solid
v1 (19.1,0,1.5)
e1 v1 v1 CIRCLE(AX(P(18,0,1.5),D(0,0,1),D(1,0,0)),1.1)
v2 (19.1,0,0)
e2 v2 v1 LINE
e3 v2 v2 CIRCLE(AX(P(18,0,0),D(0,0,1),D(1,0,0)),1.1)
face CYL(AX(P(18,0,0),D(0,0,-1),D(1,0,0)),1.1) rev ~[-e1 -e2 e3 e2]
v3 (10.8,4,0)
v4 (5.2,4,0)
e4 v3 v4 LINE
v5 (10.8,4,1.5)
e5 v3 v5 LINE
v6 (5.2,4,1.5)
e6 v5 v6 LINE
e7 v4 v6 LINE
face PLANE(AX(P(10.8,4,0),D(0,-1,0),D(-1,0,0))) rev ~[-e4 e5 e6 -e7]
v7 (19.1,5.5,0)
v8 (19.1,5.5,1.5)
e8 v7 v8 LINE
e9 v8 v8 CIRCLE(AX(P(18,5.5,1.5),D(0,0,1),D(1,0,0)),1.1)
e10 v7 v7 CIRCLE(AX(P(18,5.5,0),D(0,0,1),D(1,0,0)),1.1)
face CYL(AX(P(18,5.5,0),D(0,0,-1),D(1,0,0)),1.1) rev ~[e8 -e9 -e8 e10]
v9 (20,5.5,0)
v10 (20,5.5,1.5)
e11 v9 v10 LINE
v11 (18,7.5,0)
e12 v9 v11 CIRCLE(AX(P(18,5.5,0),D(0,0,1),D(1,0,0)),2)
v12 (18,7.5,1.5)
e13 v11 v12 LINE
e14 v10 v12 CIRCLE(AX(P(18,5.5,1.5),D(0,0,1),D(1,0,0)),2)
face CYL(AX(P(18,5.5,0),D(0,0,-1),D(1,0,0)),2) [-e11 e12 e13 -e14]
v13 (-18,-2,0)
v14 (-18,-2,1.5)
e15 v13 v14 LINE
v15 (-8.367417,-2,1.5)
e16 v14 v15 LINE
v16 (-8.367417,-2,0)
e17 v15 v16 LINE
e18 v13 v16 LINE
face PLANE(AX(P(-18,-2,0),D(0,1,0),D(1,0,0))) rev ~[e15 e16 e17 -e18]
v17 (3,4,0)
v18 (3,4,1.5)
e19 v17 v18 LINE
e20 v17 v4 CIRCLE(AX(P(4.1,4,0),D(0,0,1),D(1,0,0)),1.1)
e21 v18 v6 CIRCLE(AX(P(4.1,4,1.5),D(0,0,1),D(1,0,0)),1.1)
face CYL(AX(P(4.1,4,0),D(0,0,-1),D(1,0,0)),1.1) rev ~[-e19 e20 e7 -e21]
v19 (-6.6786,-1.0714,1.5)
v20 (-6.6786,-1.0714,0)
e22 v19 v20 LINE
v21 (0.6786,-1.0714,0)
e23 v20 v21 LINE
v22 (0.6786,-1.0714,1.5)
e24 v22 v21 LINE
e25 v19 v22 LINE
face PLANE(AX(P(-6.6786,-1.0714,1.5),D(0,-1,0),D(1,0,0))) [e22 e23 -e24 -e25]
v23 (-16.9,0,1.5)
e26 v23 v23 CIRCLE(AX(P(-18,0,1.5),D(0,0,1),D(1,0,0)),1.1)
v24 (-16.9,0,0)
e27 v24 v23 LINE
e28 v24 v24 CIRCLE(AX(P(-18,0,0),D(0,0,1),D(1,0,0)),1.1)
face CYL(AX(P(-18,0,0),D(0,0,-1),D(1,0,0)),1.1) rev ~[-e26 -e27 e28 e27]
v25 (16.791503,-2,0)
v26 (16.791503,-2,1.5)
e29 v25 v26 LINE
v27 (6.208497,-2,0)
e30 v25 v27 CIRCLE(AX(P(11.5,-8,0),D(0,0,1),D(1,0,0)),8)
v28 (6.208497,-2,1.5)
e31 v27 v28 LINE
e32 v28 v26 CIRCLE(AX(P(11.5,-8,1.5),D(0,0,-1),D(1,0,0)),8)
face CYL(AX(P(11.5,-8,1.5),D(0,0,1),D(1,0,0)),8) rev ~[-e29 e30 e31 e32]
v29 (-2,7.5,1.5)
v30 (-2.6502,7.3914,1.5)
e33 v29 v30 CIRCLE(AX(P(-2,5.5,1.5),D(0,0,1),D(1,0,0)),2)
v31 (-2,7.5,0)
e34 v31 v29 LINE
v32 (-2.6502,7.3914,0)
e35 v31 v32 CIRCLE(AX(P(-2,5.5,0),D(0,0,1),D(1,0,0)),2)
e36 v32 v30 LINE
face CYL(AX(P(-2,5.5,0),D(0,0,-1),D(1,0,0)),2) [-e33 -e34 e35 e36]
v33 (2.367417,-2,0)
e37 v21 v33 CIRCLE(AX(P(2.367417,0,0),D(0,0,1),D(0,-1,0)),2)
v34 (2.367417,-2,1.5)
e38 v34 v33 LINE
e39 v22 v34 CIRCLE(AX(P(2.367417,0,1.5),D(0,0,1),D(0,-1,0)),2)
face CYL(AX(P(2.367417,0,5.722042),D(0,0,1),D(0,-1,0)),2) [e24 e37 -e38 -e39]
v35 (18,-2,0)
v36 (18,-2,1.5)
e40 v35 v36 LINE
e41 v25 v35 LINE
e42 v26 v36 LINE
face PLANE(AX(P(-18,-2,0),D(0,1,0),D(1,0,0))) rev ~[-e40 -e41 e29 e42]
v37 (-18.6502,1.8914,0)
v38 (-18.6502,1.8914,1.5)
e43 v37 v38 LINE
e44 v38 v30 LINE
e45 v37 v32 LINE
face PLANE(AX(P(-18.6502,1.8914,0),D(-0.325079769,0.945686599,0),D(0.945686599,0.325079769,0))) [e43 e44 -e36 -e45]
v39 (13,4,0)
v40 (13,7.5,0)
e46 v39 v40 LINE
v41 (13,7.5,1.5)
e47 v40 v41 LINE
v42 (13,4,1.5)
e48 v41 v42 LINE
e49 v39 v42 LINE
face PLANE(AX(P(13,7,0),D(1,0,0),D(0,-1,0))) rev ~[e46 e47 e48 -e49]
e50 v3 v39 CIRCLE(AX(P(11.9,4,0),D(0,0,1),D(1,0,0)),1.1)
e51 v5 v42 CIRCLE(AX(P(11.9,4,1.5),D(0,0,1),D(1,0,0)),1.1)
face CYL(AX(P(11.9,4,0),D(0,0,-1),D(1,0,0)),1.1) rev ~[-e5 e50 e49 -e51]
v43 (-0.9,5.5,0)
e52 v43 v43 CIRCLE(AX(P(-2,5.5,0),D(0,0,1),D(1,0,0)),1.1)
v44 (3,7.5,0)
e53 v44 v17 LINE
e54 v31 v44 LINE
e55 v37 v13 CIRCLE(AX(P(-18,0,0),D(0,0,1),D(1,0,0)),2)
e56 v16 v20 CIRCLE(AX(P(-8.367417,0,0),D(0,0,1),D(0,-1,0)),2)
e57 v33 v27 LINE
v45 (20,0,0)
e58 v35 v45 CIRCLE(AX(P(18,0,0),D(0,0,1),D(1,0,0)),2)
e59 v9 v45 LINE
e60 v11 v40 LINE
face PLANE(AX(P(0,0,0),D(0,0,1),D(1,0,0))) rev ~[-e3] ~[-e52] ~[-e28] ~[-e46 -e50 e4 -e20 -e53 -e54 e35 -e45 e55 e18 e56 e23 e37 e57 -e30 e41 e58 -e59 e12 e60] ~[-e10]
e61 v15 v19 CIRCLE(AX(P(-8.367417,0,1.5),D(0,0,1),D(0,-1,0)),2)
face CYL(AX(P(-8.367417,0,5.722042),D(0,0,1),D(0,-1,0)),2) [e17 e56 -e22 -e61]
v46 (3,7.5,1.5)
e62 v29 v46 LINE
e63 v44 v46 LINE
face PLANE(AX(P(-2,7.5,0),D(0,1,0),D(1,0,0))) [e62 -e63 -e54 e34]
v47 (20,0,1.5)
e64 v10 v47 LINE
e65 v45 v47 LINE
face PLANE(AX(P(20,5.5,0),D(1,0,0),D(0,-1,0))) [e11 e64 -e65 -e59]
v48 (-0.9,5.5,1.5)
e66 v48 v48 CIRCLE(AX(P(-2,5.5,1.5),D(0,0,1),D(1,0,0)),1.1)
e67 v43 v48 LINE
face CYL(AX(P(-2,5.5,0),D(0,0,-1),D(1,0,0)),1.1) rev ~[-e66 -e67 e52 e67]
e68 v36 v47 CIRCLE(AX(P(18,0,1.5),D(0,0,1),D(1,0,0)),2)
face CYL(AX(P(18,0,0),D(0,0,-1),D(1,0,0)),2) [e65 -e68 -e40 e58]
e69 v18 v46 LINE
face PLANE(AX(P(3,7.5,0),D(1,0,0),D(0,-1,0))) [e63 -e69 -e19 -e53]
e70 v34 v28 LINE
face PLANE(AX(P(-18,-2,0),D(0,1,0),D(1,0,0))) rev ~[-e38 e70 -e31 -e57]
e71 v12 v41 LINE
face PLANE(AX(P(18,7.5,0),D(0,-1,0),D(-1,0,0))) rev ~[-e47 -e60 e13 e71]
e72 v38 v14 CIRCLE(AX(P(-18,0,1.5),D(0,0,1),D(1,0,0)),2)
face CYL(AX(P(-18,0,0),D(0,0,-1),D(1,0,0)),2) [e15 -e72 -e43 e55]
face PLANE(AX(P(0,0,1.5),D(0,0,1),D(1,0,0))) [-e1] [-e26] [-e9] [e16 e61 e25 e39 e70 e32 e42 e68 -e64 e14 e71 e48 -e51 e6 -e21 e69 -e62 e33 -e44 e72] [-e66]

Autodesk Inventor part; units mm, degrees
ref_plane "YZ Plane" through (0, 0, 0) normal (1, 0, 0) x (0, 1, 0)
ref_plane "XZ Plane" through (0, 0, 0) normal (0, 1, 0) x (-1, 0, 0)
ref_plane "XY Plane" through (0, 0, 0) normal (0, 0, 1) x (1, 0, 0)
sketch "スケッチ1" plane through (0, 0, 0) normal (0, 0, 1) x (1, 0, 0)
  circle A0 centre (-18, 0) radius 1.1
  circle A1 centre (18, 0) radius 1.1
  circle A2 centre (-18, 0) radius 2
  circle A3 centre (18, 0) radius 2
  line L0 (3, 7) -> (13, 7)
  line L1 (13, 7) -> (13, 4)
  line L2 (13, 4) -> (3, 4)
  line L3 (3, 4) -> (3, 7)
  circle A4 centre (4.1, 4) radius 1.1
  line L4 (8, 7) -> (8, 3.6941) construction
  circle A5 centre (11.9, 4) radius 1.1
  circle A6 centre (18, 5.5) radius 1.1
  circle A7 centre (-2, 5.5) radius 1.1
  circle A8 centre (-2, 5.5) radius 2
  circle A9 centre (18, 5.5) radius 2
  line L5 (-18.6502, 1.8914) -> (-2.6502, 7.3914)
  line L6 (-2, 7.5) -> (3, 7.5)
  line L7 (3, 7.5) -> (3, 7)
  line L8 (20, 5.5) -> (20, 0)
  line L9 (-18, -2) -> (18, -2)
  line L10 (18, 7.5) -> (13, 7.5)
  line L11 (13, 7.5) -> (13, 7)
  point P0 (0, 0)
  point P1 (13, 5.5)
  point P2 (10.8, 4)
  point P3 (5.2, 4)
  dimension "d0" = 2.2
  dimension "d1" = 2.2
  dimension "d2" = 36
  dimension "d3" = 18
  dimension "d4" = 4
  dimension "d5" = 4
  dimension "d6" = 3
  dimension "d7" = 10
  dimension "d8" = 2.2
  dimension "d9" = 2.2
  dimension "d10" = 5
  dimension "d11" = 4
  dimension "d12" = 4
  dimension "d13" = 4
extrude "押し出し1" add sketch "スケッチ1" along normal blind 1.5 contours A2 | A2 L5 A8 L6 L7 L3 A4 L2 A5 L1 L11 L10 A9 L8 A3 L9 | A8 | A3 | A9
sketch "スケッチ3" plane through (0, 0, 1.5) normal (0, 0, 1) x (1, 0, 0)
  circle A0 centre (11.5, -8) radius 8 projected
  line L0 (-6.1786, -1.5714) -> (-6.1786, -5.4286) projected
  line L1 (0.1786, -1.5714) -> (-6.1786, -1.5714) projected
  line L2 (0.1786, -5.4286) -> (0.1786, -1.5714) projected
  line L3 (-18, -2) -> (18, -2) projected
  line L4 (-6.6786, -5.4286) -> (-6.6786, -1.0714)
  line L5 (-6.6786, -1.0714) -> (0.6786, -1.0714)
  line L6 (0.6786, -1.0714) -> (0.6786, -5.4286)
  point P0 (0, 0)
  point P1 (3.6112, -2)
  point P2 (0.6786, -2)
  point P3 (-6.6786, -2)
  dimension "d22" = 0.5
extrude "押し出し3" cut sketch "スケッチ3" against normal through all
fillet "フィレット2" radius 2 2 edges at (0.6786, -2, 0.75) (-6.6786, -2, 0.75)
equation "\"d3\" = 0.5 * d2"
equation "\"d12\" = d11"
properties part number "kosiyosetuzoku"
